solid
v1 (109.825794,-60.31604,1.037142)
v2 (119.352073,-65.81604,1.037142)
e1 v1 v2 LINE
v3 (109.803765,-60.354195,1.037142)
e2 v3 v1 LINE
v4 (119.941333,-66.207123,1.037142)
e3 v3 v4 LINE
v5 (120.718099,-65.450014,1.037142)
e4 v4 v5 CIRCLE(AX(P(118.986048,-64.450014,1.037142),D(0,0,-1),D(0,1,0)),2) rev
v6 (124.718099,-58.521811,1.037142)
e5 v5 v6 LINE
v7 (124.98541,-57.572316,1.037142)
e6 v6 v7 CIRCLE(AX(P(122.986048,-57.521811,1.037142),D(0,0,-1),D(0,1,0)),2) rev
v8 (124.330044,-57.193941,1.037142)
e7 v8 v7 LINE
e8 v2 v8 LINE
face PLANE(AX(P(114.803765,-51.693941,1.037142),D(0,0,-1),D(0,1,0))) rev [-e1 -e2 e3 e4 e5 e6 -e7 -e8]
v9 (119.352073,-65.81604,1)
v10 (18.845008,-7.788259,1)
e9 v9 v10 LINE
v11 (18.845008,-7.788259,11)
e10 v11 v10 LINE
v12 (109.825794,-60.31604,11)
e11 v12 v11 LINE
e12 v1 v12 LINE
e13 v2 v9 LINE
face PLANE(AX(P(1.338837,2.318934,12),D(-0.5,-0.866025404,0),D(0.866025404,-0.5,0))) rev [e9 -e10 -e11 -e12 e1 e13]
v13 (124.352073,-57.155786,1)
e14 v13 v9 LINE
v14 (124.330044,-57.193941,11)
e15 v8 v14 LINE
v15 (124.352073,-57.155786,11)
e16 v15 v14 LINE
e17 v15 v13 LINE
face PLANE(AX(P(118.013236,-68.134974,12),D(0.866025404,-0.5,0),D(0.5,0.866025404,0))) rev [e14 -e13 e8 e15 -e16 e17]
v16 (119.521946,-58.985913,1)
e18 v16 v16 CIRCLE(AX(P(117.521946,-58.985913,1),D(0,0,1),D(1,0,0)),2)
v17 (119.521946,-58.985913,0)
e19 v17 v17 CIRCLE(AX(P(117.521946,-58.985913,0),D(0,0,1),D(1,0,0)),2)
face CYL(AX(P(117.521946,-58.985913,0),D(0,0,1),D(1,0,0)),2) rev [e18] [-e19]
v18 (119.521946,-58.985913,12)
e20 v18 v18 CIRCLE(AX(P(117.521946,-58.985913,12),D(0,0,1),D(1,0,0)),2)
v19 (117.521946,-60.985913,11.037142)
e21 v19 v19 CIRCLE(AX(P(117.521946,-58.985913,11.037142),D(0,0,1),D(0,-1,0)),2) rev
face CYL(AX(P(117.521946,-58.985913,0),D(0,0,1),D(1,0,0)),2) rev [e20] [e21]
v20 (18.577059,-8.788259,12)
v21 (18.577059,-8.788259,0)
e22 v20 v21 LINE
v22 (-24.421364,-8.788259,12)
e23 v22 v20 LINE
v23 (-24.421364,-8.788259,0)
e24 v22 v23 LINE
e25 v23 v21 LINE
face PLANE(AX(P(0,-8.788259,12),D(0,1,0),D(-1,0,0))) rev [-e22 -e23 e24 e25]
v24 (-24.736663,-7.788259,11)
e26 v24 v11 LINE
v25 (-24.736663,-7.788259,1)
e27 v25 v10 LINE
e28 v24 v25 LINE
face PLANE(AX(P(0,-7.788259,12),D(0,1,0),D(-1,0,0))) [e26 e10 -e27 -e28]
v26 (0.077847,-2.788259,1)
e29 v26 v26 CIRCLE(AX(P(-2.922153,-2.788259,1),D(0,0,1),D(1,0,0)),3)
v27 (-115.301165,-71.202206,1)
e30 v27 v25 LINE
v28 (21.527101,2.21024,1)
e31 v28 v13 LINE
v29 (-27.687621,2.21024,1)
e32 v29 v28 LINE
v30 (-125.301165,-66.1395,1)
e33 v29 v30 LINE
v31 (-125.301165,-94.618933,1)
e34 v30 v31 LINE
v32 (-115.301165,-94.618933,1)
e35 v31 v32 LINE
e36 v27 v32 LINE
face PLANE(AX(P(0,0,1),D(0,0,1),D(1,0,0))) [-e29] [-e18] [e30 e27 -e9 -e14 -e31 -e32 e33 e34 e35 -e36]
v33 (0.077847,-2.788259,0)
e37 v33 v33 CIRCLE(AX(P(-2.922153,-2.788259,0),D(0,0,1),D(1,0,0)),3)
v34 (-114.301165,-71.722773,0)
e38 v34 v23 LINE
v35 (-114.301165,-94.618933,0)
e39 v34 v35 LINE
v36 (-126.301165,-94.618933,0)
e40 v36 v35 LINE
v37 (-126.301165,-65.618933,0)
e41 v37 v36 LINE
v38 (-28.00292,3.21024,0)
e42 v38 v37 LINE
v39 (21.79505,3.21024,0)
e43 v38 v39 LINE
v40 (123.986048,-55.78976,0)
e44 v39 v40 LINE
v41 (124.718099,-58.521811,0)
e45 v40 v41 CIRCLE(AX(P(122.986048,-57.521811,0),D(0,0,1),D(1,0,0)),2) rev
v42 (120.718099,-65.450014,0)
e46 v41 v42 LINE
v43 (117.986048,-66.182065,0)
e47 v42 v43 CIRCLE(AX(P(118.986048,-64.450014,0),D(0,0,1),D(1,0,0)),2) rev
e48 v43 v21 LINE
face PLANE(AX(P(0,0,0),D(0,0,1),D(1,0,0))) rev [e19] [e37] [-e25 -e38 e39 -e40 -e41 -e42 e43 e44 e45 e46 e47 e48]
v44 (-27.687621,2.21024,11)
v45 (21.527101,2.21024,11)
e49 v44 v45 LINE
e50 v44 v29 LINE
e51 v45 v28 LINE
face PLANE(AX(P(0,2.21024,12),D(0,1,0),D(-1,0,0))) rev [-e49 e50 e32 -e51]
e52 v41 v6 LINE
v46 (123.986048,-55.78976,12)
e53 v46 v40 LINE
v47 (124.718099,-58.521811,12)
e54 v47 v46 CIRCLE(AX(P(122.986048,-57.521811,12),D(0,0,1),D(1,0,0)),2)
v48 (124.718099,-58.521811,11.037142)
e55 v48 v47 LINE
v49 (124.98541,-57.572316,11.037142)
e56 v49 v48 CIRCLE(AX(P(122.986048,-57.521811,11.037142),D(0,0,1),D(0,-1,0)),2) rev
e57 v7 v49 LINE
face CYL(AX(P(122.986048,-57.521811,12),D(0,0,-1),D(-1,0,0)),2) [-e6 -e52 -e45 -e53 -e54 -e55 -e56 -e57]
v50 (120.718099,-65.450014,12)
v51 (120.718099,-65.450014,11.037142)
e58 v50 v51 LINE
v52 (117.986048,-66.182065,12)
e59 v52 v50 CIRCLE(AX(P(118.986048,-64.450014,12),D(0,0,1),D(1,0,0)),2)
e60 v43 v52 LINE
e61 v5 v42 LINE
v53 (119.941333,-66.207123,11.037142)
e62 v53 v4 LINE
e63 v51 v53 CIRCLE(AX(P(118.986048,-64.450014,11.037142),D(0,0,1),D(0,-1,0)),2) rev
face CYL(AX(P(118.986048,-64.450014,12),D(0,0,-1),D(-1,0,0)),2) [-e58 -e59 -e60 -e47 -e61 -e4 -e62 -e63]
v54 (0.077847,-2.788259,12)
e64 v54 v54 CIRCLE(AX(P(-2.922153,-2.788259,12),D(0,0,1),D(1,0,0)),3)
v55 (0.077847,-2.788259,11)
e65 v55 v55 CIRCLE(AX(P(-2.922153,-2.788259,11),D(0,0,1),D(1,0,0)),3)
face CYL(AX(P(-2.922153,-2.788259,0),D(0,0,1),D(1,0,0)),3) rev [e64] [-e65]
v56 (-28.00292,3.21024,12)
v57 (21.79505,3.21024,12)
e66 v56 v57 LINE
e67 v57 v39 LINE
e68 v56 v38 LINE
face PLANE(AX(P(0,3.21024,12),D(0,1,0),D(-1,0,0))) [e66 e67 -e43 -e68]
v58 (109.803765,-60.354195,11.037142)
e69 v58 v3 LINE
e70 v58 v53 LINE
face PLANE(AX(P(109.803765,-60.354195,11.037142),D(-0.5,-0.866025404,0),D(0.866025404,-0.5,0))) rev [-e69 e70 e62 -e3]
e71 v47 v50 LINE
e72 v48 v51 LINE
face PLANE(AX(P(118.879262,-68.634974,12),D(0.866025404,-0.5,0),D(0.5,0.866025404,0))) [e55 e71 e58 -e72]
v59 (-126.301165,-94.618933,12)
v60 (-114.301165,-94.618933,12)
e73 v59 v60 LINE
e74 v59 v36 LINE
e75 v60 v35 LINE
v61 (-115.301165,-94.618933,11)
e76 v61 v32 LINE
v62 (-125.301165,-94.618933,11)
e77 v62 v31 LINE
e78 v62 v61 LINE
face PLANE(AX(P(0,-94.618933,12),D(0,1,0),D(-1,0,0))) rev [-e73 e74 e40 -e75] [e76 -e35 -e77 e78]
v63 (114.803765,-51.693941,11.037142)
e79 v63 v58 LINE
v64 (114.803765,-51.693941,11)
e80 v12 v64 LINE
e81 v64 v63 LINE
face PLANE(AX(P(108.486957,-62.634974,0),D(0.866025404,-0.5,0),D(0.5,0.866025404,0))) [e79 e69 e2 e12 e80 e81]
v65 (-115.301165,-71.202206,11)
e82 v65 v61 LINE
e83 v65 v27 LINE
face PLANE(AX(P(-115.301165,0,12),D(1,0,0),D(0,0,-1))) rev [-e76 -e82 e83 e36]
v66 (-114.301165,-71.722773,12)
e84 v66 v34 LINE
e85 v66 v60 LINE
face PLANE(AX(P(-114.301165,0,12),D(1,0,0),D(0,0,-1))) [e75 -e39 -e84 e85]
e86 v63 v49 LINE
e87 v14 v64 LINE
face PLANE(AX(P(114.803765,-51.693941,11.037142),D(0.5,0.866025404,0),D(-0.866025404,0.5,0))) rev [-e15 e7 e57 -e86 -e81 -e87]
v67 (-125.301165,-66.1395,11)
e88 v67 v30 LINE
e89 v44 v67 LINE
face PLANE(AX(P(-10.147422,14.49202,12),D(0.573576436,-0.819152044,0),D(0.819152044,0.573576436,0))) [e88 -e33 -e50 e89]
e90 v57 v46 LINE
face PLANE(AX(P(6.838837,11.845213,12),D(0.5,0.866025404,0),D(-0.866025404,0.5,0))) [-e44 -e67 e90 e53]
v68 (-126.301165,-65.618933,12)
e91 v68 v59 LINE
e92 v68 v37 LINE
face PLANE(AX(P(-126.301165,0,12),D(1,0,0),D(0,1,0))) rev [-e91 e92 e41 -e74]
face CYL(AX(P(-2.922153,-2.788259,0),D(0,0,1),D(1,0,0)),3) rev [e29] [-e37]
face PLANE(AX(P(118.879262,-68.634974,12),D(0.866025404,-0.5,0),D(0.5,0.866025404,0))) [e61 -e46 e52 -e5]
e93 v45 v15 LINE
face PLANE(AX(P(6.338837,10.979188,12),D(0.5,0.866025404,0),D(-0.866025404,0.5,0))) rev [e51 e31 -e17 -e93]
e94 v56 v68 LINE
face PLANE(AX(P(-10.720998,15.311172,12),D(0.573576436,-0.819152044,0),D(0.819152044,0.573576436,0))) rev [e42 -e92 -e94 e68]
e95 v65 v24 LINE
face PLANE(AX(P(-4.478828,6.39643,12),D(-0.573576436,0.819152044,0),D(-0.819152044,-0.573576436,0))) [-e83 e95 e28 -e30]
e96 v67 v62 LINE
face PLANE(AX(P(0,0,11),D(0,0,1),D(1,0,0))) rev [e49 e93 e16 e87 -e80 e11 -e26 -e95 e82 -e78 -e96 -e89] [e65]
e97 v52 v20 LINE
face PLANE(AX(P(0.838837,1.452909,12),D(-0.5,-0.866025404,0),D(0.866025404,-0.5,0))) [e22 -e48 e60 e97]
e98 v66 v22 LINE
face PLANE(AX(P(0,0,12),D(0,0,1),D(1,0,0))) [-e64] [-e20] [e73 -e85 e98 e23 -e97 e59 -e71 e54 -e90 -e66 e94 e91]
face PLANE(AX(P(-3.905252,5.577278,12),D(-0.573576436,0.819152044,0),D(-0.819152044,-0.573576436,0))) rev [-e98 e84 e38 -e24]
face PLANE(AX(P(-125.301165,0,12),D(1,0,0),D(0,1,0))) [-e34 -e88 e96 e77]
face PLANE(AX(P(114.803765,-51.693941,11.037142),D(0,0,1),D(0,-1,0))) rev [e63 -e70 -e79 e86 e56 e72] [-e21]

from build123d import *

# Parameters (mm, degrees)
BOSS_EXTRUDE1_DEPTH = 12
SHELL1_T            = -1
SKETCH3_R           = 3
SKETCH3_R_2         = 2
CUT_EXTRUDE1_DEPTH  = 12
SKETCH4_W           = 10
SKETCH4_H           = 10
CUT_EXTRUDE2_DEPTH  = 12
FILLET1_R           = 2


with BuildPart() as part:
    # Sketch2 → Boss-Extrude1 (new body)
    with BuildSketch(Plane.XY):
        Polygon((-28.002919882, 3.210239845), (-126.301165196, -65.618932518), (-126.301165196, -94.618932518), (-114.301165196, -94.618932518), (-114.301165196, -71.722772739), (-24.421364281, -8.788258605), (18.577059182, -8.788258605), (119.718098707, -67.182065001), (125.718098707, -56.789760155), (21.795050253, 3.210239845), align=None)
    extrude(amount=BOSS_EXTRUDE1_DEPTH)

    # Shell1
    shell1_openings = [part.faces().sort_by_distance(p)[0] for p in [
        (-120.301165196, -94.618932518, 6),
    ]]
    offset(amount=SHELL1_T, openings=shell1_openings, kind=Kind.INTERSECTION)

    # Sketch3 → Cut-Extrude1 (cut)
    with BuildSketch(Plane.XY.offset(12)):
        with Locations((-2.922152549, -2.788258605)):
            Circle(SKETCH3_R)
        with Locations((117.521946284, -58.985912578)):
            Circle(SKETCH3_R_2)
    extrude(amount=-CUT_EXTRUDE1_DEPTH, mode=Mode.SUBTRACT)

    # Sketch4 → Cut-Extrude2 (cut)
    with BuildSketch(Plane(origin=(118.879261515, -68.634973637, 0), x_dir=(0, 0, -1), z_dir=(0.8660254037844357, -0.500000000000005, 0))):
        with Locations((-6.037142442, 7.633616623)):
            Rectangle(SKETCH4_W, SKETCH4_H)
    extrude(amount=-CUT_EXTRUDE2_DEPTH, mode=Mode.SUBTRACT)

    # Fillet1
    # the kernel refuses this fillet: 2 mm, written as the material it takes off along each edge
    with BuildSketch(Plane(origin=(119.718098707, -67.182065001, -5), x_dir=(0.499999999999999, 0.8660254037844393, 0), z_dir=(0, 0, 1)), Plane(origin=(125.718098707, -56.789760155, -5), x_dir=(-0.8660254037844393, 0.499999999999999, 0), z_dir=(0, 0, 1))) as fillet1_piece_1:
        with BuildLine():
            CenterArc((FILLET1_R, FILLET1_R), FILLET1_R, 180, 90)
            Line((0, FILLET1_R), (0, 0))
            Line((0, 0), (FILLET1_R, 0))
        make_face()
    extrude(amount=22, mode=Mode.SUBTRACT)


solid = part.part
